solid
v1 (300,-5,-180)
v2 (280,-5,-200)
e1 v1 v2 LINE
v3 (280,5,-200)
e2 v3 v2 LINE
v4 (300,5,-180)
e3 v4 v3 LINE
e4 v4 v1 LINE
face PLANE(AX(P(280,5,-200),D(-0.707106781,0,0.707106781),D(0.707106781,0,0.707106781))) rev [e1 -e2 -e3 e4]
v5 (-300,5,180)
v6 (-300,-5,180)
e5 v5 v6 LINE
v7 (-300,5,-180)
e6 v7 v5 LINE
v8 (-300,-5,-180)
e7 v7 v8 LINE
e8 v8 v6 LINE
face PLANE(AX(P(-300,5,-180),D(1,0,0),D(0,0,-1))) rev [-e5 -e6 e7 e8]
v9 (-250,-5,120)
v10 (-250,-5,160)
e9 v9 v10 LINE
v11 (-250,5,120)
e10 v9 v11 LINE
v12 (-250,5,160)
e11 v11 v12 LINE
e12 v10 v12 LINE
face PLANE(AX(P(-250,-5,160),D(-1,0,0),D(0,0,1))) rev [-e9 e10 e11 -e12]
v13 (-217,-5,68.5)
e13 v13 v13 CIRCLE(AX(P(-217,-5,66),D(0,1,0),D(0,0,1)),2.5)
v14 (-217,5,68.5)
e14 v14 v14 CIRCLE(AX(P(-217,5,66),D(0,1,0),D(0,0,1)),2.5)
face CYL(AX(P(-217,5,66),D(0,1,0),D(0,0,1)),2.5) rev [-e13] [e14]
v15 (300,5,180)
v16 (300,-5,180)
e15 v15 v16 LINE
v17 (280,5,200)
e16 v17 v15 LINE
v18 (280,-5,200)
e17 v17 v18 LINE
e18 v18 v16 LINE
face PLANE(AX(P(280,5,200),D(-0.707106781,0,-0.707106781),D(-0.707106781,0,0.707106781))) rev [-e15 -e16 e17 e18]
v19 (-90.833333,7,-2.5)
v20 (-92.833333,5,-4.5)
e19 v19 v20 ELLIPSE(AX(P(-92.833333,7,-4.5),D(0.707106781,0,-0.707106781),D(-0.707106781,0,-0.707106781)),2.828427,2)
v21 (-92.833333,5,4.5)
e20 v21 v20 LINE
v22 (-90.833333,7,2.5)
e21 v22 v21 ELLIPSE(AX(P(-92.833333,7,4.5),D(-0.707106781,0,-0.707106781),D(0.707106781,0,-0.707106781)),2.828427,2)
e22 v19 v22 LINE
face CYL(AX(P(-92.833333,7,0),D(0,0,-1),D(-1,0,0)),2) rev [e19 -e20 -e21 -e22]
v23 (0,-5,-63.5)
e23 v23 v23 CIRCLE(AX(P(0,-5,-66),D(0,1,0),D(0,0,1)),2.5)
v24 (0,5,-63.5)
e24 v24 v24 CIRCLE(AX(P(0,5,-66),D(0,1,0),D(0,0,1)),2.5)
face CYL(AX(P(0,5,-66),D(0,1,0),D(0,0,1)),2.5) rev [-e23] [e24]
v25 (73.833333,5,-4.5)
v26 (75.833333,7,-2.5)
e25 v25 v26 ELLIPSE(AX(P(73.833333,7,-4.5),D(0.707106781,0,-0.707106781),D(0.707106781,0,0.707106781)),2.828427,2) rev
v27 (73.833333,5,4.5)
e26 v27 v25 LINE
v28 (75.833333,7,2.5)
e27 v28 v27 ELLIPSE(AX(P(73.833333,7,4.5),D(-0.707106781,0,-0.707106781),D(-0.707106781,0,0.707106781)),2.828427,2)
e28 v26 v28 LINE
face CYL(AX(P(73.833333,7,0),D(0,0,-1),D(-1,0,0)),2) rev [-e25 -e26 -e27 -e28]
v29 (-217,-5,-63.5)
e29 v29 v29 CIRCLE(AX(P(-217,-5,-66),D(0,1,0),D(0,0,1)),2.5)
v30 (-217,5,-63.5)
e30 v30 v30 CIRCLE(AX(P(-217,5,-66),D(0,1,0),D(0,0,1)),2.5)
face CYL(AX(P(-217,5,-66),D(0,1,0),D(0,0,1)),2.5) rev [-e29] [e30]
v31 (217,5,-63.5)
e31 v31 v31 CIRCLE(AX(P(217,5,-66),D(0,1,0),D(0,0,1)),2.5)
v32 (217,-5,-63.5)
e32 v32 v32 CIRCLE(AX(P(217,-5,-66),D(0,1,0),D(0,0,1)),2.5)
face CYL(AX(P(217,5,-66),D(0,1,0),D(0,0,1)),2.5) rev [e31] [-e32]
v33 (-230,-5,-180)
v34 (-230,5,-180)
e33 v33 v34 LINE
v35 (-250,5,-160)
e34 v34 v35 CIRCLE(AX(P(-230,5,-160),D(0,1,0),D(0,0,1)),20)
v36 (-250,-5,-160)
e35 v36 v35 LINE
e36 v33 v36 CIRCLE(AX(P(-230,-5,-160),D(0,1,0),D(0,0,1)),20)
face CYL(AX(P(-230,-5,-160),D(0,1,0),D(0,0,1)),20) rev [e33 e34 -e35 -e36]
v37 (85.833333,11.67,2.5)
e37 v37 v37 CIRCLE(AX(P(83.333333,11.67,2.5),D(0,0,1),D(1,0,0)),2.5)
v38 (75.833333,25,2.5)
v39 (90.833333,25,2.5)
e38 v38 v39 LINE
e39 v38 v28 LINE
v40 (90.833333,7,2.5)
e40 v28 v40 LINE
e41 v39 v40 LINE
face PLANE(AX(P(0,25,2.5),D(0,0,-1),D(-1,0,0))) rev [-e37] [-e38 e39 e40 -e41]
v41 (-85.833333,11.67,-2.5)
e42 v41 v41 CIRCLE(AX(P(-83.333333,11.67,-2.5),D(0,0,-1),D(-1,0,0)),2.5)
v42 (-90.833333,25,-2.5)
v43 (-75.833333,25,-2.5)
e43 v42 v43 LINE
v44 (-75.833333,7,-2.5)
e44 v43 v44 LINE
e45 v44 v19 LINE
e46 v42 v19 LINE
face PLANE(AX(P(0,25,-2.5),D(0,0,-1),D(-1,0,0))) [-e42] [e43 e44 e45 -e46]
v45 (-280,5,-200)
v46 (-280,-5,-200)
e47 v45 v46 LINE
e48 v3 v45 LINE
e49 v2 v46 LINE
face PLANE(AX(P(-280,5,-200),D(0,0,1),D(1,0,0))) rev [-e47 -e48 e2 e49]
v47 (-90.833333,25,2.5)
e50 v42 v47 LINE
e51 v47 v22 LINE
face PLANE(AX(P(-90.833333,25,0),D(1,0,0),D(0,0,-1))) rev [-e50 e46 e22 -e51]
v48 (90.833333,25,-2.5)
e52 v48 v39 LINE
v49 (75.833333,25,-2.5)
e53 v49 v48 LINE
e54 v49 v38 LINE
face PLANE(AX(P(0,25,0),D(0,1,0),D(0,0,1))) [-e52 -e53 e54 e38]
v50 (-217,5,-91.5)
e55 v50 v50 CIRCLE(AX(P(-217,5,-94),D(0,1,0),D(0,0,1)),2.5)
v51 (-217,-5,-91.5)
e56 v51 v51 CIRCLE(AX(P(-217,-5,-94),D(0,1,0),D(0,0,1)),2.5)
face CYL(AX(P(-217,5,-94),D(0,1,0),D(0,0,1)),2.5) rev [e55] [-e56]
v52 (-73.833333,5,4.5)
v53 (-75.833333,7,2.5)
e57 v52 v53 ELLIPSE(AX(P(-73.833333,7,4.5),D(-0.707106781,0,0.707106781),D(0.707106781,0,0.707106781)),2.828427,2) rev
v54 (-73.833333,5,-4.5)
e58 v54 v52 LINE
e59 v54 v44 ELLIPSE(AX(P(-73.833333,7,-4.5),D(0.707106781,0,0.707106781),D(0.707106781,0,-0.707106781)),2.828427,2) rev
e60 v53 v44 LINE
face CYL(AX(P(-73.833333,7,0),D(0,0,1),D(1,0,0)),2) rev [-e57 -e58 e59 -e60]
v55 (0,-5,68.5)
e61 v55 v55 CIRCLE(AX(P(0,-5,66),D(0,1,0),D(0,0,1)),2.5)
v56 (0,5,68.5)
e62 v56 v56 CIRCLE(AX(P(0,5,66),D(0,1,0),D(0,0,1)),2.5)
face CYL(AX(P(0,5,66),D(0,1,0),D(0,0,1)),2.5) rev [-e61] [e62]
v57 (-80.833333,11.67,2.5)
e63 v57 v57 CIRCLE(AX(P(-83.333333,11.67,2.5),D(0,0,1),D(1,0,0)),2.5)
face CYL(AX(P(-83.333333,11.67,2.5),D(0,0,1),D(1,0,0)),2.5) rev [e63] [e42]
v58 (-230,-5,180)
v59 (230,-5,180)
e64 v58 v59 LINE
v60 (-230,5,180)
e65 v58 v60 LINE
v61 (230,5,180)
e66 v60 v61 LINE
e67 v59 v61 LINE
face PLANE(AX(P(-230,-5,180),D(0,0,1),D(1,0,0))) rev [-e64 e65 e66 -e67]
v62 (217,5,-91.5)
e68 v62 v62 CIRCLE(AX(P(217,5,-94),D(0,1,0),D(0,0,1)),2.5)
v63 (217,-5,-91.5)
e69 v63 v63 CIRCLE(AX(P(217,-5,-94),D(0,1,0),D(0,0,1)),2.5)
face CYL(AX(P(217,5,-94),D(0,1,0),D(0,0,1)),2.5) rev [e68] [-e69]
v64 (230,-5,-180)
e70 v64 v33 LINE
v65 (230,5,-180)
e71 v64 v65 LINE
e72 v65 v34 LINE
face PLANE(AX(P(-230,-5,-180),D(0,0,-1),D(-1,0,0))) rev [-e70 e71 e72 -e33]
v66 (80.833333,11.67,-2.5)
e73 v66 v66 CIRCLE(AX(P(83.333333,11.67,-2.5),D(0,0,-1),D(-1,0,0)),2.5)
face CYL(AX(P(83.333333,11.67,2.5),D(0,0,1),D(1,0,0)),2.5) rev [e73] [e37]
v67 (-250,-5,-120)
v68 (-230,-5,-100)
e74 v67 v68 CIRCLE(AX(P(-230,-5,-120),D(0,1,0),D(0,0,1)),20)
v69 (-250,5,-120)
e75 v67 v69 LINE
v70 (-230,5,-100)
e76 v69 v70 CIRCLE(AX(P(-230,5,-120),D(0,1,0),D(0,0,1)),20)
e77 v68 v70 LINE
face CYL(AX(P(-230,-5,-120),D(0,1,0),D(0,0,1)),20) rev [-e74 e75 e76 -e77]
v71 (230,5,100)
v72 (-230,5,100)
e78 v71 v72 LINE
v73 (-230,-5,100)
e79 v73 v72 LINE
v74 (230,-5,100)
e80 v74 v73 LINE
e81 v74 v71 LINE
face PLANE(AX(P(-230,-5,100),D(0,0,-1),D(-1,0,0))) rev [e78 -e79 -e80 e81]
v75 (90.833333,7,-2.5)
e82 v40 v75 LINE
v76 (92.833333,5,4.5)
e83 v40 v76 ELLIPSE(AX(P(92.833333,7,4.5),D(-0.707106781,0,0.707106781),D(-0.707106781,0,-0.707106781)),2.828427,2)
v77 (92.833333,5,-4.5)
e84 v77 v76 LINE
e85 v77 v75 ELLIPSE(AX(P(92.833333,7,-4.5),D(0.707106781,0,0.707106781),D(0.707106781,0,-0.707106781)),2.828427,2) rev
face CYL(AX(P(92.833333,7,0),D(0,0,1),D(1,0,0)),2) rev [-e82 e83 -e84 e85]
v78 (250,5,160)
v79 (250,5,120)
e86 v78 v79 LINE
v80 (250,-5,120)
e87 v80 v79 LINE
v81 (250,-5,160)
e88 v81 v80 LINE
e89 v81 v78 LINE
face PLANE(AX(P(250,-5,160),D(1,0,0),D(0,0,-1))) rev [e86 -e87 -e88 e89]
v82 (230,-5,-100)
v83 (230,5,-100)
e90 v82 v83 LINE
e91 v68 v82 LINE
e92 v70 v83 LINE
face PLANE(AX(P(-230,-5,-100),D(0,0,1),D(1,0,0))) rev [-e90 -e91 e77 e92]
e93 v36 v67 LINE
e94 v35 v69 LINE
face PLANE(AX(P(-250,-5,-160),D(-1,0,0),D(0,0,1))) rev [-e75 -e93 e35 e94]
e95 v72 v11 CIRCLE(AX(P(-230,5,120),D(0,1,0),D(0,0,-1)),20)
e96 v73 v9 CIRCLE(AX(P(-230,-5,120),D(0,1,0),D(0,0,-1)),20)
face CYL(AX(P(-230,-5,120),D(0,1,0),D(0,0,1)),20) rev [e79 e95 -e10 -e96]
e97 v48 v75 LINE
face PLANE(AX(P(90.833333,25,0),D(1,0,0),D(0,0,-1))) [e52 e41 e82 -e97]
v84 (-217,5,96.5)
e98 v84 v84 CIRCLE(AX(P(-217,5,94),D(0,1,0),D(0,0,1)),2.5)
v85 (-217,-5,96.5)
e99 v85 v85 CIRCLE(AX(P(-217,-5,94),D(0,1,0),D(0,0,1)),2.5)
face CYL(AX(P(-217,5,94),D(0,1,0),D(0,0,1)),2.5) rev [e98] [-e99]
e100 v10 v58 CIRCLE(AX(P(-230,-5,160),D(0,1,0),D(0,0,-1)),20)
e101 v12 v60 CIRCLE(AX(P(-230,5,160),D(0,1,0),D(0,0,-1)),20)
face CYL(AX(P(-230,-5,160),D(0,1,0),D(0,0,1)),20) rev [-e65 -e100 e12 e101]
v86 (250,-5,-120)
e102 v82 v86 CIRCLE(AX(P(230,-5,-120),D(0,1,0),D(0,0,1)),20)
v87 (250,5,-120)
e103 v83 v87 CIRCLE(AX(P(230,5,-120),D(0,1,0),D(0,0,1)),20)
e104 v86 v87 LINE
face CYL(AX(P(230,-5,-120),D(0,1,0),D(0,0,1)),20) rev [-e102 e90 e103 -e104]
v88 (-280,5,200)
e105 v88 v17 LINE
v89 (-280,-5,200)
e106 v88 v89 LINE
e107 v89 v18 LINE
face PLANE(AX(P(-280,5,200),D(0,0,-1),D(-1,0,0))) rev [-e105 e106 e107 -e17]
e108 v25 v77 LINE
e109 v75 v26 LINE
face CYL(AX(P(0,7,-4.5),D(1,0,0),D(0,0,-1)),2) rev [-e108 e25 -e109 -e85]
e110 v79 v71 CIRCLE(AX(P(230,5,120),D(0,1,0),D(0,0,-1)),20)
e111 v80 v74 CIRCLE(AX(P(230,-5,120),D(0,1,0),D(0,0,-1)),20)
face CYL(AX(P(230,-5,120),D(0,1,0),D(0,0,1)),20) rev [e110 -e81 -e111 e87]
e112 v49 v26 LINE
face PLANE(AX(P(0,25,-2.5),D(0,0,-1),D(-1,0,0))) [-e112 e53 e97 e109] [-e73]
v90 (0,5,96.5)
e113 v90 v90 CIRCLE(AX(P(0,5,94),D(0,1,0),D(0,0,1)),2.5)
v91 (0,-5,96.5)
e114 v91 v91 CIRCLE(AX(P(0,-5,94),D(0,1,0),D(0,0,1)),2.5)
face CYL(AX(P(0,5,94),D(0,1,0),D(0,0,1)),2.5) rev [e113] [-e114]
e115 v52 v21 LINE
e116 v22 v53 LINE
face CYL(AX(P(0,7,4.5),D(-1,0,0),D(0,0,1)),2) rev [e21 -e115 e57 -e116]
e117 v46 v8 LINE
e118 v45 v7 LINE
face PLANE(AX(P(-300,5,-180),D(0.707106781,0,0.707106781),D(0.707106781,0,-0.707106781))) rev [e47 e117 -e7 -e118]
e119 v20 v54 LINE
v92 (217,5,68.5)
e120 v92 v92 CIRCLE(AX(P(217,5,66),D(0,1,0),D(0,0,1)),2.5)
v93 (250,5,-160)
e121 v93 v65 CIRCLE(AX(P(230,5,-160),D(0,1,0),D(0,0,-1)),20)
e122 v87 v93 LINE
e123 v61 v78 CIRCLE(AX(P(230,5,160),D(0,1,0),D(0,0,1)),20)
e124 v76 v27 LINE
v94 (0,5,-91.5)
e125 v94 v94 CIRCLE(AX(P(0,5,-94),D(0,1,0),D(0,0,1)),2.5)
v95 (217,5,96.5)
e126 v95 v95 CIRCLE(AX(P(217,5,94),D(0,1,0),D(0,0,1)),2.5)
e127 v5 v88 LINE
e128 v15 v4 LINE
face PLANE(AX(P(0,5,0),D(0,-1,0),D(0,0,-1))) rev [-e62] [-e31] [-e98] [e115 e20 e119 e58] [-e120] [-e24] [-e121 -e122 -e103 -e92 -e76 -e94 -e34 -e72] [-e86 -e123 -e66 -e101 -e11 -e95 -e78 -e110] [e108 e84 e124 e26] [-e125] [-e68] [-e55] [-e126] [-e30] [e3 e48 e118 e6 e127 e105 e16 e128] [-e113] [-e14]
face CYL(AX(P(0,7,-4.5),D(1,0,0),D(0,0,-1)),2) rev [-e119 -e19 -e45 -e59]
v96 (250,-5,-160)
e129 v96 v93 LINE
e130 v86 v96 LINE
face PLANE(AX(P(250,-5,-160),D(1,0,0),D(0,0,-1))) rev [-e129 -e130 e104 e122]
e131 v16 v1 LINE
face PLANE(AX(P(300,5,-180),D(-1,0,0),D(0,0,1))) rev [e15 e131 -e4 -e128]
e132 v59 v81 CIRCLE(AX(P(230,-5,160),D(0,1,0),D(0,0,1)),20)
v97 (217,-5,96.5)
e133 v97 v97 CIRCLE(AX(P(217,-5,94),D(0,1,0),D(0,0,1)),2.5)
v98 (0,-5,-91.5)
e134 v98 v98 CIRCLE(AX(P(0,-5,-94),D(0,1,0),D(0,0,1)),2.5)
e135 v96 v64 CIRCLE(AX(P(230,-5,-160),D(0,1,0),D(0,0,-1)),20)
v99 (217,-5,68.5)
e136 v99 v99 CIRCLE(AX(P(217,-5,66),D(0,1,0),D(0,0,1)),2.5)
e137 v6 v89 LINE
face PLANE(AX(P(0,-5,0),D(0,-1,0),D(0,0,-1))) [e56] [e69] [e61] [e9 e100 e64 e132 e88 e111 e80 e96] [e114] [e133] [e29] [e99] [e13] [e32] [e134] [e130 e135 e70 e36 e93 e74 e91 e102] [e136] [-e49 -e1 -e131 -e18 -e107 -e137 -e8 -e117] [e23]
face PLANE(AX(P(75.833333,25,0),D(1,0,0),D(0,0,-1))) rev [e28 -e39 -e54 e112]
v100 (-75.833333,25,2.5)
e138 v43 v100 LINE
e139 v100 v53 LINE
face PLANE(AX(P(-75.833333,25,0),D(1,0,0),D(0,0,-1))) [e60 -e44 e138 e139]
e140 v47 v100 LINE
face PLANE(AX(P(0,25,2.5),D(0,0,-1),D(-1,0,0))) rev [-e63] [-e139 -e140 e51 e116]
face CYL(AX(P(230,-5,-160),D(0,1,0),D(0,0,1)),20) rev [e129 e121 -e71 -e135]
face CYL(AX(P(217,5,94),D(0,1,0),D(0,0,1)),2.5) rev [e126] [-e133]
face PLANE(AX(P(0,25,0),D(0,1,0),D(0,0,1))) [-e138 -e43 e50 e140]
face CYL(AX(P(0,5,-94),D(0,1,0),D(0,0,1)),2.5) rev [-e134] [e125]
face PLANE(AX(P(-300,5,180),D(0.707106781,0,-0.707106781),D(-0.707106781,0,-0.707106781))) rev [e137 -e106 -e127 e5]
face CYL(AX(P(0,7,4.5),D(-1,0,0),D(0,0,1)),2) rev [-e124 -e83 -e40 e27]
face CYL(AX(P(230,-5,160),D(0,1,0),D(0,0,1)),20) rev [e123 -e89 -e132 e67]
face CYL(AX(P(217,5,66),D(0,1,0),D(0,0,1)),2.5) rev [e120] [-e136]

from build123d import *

# Parameters (mm, degrees)
BOSS_EXTRUDE1_DEPTH           = 5
CUT_EXTRUDE1_DEPTH            = 361.589794642
CUT_EXTRUDE1_DEPTH_BACK       = 361.589794642
SKETCH3_W                     = 7.5
SKETCH3_H                     = 5
BOSS_EXTRUDE2_DEPTH           = 20
F_5_0MM_START                 = -2.5
F_5_0MM_DOWEL_HOLE1_OUTLINE_R = 2.5
F_5_0MM_DOWEL_HOLE1_DEPTH     = 5
FILLET1_R                     = 2
F_5_0MM_DOWEL_HOLE3_D         = 5


# Read off the part's stored shape, not the designer's step: Ø5.0mm Dowel Hole1
with BuildPart() as part:
    # Sketch1 → Boss-Extrude1 (new, symmetric)
    with BuildSketch(Plane(origin=(0, 0, 0), x_dir=(1, 0, 0), z_dir=(0, 1, 0))):
        Polygon((-300, 180), (-280, 200), (280, 200), (300, 180), (300, -180), (280, -200), (-280, -200), (-300, -180), align=None)
    extrude(amount=BOSS_EXTRUDE1_DEPTH, both=True)

    # Sketch2 → Cut-Extrude1 (cut, two sides: drawn at the far end of the back side and taken through both)
    with BuildSketch(Plane(origin=(0, 0, 0), x_dir=(1, 0, 0), z_dir=(0, 1, 0)).offset(-CUT_EXTRUDE1_DEPTH_BACK)):
        with BuildLine():
            Line((-230, 180), (230, 180))
            ThreePointArc((230, 180), (244.142135624, 174.142135624), (250, 160))
            Line((250, 160), (250, 120))
            ThreePointArc((250, 120), (244.142135624, 105.857864376), (230, 100))
            Line((230, 100), (-230, 100))
            ThreePointArc((-230, 100), (-244.142135624, 105.857864376), (-250, 120))
            Line((-250, 120), (-250, 160))
            ThreePointArc((-250, 160), (-244.142135624, 174.142135624), (-230, 180))
        make_face()
        with BuildLine():
            Line((250, -160), (250, -120))
            ThreePointArc((250, -120), (244.142135624, -105.857864376), (230, -100))
            Line((230, -100), (-230, -100))
            ThreePointArc((-230, -100), (-244.142135624, -105.857864376), (-250, -120))
            Line((-250, -120), (-250, -160))
            ThreePointArc((-250, -160), (-244.142135624, -174.142135624), (-230, -180))
            Line((-230, -180), (230, -180))
            ThreePointArc((230, -180), (244.142135624, -174.142135624), (250, -160))
        make_face()
    extrude(amount=CUT_EXTRUDE1_DEPTH + CUT_EXTRUDE1_DEPTH_BACK, mode=Mode.SUBTRACT)

    # Sketch3 → Boss-Extrude2 (add)
    with BuildSketch(Plane(origin=(0, 5, 0), x_dir=(1, 0, 0), z_dir=(0, 1, 0))):
        with Locations((-87.083333333, 0)):
            Rectangle(SKETCH3_W, SKETCH3_H)
        with Locations((-79.583333333, 0)):
            Rectangle(SKETCH3_W, SKETCH3_H)
        with Locations((79.583333333, 0)):
            Rectangle(SKETCH3_W, SKETCH3_H)
        with Locations((87.083333333, 0)):
            Rectangle(SKETCH3_W, SKETCH3_H)
    extrude(amount=BOSS_EXTRUDE2_DEPTH)

    # Ø5.0mm Dowel Hole1 outline → Ø5.0mm Dowel Hole1 (cut)
    with BuildSketch(Plane.XY.offset(F_5_0MM_START)):
        with Locations((83.333333333, 11.67)):
            Circle(F_5_0MM_DOWEL_HOLE1_OUTLINE_R)
        with Locations((-83.333333333, 11.67)):
            Circle(F_5_0MM_DOWEL_HOLE1_OUTLINE_R)
    extrude(amount=F_5_0MM_DOWEL_HOLE1_DEPTH, mode=Mode.SUBTRACT)

    # Fillet1
    fillet1_edges = [part.edges().sort_by_distance(p)[0] for p in [
        (-90.833333333, 5, 0),
        (-83.333333333, 5, 2.5),
        (-83.333333333, 5, -2.5),
        (-75.833333333, 5, 0),
        (75.833333333, 5, 0),
        (83.333333333, 5, 2.5),
        (83.333333333, 5, -2.5),
        (90.833333333, 5, 0),
    ]]
    fillet(fillet1_edges, radius=FILLET1_R)

    # Ø5.0mm Dowel Hole3 (through all)
    with Locations(Plane(origin=(0, 5, 0), x_dir=(1, 0, 0), z_dir=(0, 1, 0))):
        with Locations((-217, 94), (-217, 66), (-217, -94), (-217, -66), (0, 94), (0, 66), (0, -66), (0, -94), (217, -94), (217, -66), (217, 66), (217, 94)):
            Hole(F_5_0MM_DOWEL_HOLE3_D / 2)


solid = part.part
